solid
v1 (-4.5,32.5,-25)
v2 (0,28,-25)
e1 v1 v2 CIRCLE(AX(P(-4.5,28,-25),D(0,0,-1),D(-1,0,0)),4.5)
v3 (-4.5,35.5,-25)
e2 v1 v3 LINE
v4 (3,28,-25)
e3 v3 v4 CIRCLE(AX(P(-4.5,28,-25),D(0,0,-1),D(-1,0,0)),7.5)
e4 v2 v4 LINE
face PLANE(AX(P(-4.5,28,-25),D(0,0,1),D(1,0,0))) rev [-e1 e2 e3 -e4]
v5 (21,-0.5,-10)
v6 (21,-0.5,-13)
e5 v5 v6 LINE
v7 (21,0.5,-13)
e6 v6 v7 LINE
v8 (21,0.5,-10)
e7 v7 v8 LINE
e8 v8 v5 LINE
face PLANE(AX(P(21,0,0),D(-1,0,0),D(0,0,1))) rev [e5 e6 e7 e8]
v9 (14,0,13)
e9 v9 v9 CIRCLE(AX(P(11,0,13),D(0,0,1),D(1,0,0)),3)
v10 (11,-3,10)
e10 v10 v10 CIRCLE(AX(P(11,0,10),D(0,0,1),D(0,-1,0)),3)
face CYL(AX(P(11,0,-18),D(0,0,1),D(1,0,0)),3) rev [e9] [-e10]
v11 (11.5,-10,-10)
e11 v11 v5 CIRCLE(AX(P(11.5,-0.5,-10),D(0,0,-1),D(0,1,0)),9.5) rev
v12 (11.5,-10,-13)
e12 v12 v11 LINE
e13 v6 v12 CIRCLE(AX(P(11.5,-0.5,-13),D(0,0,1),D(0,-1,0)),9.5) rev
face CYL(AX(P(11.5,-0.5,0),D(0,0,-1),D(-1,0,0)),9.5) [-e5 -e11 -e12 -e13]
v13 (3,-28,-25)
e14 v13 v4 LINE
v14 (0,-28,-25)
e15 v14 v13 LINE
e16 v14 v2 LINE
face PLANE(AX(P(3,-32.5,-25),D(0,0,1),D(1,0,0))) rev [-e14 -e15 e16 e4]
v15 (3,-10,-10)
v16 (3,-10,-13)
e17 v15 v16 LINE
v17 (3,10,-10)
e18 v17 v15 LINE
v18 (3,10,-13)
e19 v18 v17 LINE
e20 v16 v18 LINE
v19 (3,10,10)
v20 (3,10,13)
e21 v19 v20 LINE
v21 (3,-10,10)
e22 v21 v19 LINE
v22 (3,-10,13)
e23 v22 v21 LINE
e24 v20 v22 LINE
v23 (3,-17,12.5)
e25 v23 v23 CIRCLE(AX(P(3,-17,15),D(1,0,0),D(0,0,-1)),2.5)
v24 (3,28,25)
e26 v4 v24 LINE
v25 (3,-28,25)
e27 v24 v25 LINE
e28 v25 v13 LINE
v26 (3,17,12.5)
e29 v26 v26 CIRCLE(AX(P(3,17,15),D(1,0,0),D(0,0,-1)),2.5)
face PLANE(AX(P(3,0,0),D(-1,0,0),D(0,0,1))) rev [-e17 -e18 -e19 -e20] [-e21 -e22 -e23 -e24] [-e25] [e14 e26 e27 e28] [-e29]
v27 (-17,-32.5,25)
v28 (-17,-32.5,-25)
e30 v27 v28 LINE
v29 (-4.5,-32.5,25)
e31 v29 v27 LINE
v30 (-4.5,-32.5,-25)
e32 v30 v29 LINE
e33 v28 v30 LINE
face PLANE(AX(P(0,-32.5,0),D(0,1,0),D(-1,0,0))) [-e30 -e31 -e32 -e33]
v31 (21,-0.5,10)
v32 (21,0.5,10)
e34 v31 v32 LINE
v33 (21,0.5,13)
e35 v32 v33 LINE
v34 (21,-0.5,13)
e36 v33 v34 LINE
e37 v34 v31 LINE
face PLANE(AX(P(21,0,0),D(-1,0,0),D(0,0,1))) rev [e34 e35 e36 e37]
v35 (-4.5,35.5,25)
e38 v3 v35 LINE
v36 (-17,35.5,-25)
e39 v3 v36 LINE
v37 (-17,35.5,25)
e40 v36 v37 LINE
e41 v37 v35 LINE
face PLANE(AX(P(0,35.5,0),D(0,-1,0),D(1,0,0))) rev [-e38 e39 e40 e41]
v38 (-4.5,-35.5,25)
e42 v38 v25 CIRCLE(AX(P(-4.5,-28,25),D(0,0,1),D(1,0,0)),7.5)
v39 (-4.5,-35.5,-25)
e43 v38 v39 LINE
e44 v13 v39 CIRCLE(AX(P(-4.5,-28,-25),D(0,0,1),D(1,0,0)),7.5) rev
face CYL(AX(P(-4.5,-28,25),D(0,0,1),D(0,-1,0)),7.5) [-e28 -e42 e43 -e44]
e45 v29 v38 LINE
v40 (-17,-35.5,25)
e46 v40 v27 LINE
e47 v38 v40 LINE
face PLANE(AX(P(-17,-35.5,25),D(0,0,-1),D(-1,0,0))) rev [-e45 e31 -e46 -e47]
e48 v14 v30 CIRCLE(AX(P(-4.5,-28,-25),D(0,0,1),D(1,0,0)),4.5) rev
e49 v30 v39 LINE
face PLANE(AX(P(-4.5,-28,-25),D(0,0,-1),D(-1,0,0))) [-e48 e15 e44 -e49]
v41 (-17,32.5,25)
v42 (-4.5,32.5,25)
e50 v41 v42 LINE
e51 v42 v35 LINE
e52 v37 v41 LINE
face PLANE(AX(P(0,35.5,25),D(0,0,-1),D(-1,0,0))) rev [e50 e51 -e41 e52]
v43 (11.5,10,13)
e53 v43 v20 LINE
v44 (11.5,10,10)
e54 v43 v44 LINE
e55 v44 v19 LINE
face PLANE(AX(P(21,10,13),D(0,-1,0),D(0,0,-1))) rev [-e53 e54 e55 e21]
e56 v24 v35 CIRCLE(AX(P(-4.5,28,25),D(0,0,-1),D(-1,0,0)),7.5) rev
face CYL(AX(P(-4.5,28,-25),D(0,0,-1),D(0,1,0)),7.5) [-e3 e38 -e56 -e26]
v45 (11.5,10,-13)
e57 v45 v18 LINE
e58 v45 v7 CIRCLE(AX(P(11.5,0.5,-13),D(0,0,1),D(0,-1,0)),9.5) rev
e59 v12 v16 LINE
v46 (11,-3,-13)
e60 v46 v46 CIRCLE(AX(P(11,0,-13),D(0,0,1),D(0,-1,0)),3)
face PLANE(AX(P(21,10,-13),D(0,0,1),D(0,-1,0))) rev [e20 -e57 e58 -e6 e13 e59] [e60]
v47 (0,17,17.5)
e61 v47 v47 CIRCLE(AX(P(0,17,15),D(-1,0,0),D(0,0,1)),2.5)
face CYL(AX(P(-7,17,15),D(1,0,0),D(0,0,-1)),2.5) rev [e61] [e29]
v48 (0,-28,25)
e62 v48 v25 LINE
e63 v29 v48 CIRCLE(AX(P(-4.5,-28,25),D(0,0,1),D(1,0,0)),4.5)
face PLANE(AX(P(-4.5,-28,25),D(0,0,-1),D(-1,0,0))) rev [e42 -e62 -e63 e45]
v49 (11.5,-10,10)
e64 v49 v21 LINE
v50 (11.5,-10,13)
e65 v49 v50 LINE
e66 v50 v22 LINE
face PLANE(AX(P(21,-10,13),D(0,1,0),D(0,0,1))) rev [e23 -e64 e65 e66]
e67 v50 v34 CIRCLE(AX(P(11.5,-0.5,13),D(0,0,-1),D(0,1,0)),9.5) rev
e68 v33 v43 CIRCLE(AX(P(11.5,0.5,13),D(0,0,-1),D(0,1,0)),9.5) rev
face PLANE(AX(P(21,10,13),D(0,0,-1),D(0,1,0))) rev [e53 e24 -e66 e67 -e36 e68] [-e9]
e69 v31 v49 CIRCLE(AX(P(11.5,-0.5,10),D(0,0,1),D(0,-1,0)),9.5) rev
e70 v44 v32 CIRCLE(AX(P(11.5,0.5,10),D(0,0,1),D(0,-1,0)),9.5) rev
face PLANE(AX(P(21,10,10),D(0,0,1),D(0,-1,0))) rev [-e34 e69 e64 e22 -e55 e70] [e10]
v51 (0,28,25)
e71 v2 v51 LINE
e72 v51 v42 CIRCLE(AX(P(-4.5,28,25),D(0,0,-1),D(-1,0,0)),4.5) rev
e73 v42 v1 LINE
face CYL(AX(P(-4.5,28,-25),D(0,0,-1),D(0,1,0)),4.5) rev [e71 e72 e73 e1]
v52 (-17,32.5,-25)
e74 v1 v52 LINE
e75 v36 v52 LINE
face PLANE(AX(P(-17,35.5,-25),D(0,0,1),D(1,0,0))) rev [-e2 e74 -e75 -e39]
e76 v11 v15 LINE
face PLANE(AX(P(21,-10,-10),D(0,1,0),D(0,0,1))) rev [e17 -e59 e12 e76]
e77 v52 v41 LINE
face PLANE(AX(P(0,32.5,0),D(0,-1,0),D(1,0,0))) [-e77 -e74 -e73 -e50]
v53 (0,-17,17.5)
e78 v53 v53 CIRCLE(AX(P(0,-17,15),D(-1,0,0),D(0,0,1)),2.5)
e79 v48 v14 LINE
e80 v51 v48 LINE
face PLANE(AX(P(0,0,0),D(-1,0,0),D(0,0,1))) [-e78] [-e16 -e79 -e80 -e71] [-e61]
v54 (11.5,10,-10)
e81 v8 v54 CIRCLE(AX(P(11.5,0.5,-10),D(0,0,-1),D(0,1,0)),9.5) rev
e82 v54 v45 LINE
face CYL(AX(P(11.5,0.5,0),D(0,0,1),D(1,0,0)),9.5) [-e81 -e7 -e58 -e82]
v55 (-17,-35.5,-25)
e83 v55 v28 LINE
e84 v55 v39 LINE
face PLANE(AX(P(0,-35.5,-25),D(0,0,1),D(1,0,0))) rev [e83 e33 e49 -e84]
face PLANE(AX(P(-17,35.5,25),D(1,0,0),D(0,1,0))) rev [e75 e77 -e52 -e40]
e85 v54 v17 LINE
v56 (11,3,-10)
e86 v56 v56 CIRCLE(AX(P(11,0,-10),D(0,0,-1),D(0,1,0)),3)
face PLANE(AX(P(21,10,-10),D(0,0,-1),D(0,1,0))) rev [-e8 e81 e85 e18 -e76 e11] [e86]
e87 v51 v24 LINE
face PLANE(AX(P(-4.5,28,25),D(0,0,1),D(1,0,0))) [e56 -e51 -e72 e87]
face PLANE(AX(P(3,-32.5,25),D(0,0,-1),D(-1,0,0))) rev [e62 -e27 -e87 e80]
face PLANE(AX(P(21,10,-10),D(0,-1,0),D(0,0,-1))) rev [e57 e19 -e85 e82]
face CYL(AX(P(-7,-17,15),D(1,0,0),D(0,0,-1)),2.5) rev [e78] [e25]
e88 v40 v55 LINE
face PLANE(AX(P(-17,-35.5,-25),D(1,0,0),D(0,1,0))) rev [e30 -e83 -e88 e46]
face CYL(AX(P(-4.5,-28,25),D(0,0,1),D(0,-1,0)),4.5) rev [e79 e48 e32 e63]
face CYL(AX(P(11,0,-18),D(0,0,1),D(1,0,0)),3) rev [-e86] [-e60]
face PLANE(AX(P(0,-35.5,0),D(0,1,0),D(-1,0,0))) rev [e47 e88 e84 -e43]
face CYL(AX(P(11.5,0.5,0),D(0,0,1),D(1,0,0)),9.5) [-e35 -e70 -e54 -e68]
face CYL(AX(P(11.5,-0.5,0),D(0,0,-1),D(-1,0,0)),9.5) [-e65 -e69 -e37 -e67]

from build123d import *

# Parameters (mm, degrees)
SKETCH1_W                      = 65
SKETCH1_H                      = 50
BASE_FLANGE1_DEPTH             = 3
EDGE_FLANGE1_STRIP_W           = 21
EDGE_FLANGE1_STRIP_H           = 3
EDGE_FLANGE1_STRIP_CUT_DEPTH   = 50
EDGE_FLANGE1_STRIP_2_W         = 21
EDGE_FLANGE1_STRIP_2_H         = 3
EDGE_FLANGE1_STRIP_CUT_2_DEPTH = 50
EDGE_FLANGE1_DEPTH             = 50
EDGE_FLANGE1_BEND_DEPTH        = 50
SKETCH13_R                     = 2.5
CUT_EXTRUDE1_DEPTH             = 10
SKETCH14_W                     = 20
SKETCH14_H                     = 3
BOSS_EXTRUDE1_DEPTH            = 18
FILLET1_R                      = 9.5
SKETCH15_R                     = 3
CUT_EXTRUDE2_DEPTH             = 31


# Sheet-metal steps are written as plain solids
with BuildPart() as part:
    # Sketch1 → Base-Flange1 (new body)
    with BuildSketch(Plane.YZ):
        Rectangle(SKETCH1_W, SKETCH1_H)
    extrude(amount=BASE_FLANGE1_DEPTH)

    # Edge-Flange1 strip (across the edge) → Edge-Flange1 strip cut (cut)
    with BuildSketch(Plane(origin=(0, 32.5, 25), x_dir=(0, -1, 0), z_dir=(0, 0, -1))):
        with Locations((-6, -1.5)):
            Rectangle(EDGE_FLANGE1_STRIP_W, EDGE_FLANGE1_STRIP_H)
    extrude(amount=EDGE_FLANGE1_STRIP_CUT_DEPTH, mode=Mode.SUBTRACT)

    # Edge-Flange1 strip 2 (across the edge) → Edge-Flange1 strip cut 2 (cut)
    with BuildSketch(Plane(origin=(0, -32.5, -25), x_dir=(0, 1, 0), z_dir=(0, 0, 1))):
        with Locations((-6, -1.5)):
            Rectangle(EDGE_FLANGE1_STRIP_2_W, EDGE_FLANGE1_STRIP_2_H)
    extrude(amount=EDGE_FLANGE1_STRIP_CUT_2_DEPTH, mode=Mode.SUBTRACT)

    # Edge-Flange1 section (across the edge) → Edge-Flange1 (add)
    with BuildSketch(Plane(origin=(0, 32.5, 25), x_dir=(0, -1, 0), z_dir=(0, 0, -1))):
        with BuildLine():
            Line((-3, 4.5), (-3, 17))
            Line((-3, 17), (0, 17))
            Line((0, 17), (0, 4.5))
            ThreePointArc((0, 4.5), (1.318019485, 1.318019485), (4.5, 0))
            Line((4.5, 0), (4.5, -3))
            ThreePointArc((4.5, -3), (-0.803300859, -0.803300859), (-3, 4.5))
        make_face()
    extrude(amount=EDGE_FLANGE1_DEPTH)

    # Edge-Flange1 section 2 (across the edge) → Edge-Flange1 bend (add)
    with BuildSketch(Plane(origin=(0, -32.5, -25), x_dir=(0, 1, 0), z_dir=(0, 0, 1))):
        with BuildLine():
            Line((-3, 4.5), (-3, 17))
            Line((-3, 17), (0, 17))
            Line((0, 17), (0, 4.5))
            ThreePointArc((0, 4.5), (1.318019485, 1.318019485), (4.5, 0))
            Line((4.5, 0), (4.5, -3))
            ThreePointArc((4.5, -3), (-0.803300859, -0.803300859), (-3, 4.5))
        make_face()
    extrude(amount=EDGE_FLANGE1_BEND_DEPTH)

    # Sketch13 → Cut-Extrude1 (cut)
    with BuildSketch(Plane.YZ.offset(3)):
        with Locations(Location((-17, 15, 0), (0, 0, 270))):
            Circle(SKETCH13_R)
        with Locations(Location((17, 15, 0), (0, 0, 270))):
            Circle(SKETCH13_R)
    extrude(amount=-CUT_EXTRUDE1_DEPTH, mode=Mode.SUBTRACT)

    # Sketch14 → Boss-Extrude1 (add)
    with BuildSketch(Plane.YZ.offset(3)):
        with Locations((0, 11.5)):
            Rectangle(SKETCH14_W, SKETCH14_H)
        with Locations((0, -11.5)):
            Rectangle(SKETCH14_W, SKETCH14_H)
    extrude(amount=BOSS_EXTRUDE1_DEPTH)

    # Fillet1
    fillet1_edges = [part.edges().sort_by_distance(p)[0] for p in [
        (21, -10, 11.5),
        (21, 10, 11.5),
        (21, -10, -11.5),
        (21, 10, -11.5),
    ]]
    fillet(fillet1_edges, radius=FILLET1_R)

    # Sketch15 → Cut-Extrude2 (cut)
    with BuildSketch(Plane.XY.offset(13)):
        with Locations((11, 0)):
            Circle(SKETCH15_R)
    extrude(amount=-CUT_EXTRUDE2_DEPTH, mode=Mode.SUBTRACT)


solid = part.part
